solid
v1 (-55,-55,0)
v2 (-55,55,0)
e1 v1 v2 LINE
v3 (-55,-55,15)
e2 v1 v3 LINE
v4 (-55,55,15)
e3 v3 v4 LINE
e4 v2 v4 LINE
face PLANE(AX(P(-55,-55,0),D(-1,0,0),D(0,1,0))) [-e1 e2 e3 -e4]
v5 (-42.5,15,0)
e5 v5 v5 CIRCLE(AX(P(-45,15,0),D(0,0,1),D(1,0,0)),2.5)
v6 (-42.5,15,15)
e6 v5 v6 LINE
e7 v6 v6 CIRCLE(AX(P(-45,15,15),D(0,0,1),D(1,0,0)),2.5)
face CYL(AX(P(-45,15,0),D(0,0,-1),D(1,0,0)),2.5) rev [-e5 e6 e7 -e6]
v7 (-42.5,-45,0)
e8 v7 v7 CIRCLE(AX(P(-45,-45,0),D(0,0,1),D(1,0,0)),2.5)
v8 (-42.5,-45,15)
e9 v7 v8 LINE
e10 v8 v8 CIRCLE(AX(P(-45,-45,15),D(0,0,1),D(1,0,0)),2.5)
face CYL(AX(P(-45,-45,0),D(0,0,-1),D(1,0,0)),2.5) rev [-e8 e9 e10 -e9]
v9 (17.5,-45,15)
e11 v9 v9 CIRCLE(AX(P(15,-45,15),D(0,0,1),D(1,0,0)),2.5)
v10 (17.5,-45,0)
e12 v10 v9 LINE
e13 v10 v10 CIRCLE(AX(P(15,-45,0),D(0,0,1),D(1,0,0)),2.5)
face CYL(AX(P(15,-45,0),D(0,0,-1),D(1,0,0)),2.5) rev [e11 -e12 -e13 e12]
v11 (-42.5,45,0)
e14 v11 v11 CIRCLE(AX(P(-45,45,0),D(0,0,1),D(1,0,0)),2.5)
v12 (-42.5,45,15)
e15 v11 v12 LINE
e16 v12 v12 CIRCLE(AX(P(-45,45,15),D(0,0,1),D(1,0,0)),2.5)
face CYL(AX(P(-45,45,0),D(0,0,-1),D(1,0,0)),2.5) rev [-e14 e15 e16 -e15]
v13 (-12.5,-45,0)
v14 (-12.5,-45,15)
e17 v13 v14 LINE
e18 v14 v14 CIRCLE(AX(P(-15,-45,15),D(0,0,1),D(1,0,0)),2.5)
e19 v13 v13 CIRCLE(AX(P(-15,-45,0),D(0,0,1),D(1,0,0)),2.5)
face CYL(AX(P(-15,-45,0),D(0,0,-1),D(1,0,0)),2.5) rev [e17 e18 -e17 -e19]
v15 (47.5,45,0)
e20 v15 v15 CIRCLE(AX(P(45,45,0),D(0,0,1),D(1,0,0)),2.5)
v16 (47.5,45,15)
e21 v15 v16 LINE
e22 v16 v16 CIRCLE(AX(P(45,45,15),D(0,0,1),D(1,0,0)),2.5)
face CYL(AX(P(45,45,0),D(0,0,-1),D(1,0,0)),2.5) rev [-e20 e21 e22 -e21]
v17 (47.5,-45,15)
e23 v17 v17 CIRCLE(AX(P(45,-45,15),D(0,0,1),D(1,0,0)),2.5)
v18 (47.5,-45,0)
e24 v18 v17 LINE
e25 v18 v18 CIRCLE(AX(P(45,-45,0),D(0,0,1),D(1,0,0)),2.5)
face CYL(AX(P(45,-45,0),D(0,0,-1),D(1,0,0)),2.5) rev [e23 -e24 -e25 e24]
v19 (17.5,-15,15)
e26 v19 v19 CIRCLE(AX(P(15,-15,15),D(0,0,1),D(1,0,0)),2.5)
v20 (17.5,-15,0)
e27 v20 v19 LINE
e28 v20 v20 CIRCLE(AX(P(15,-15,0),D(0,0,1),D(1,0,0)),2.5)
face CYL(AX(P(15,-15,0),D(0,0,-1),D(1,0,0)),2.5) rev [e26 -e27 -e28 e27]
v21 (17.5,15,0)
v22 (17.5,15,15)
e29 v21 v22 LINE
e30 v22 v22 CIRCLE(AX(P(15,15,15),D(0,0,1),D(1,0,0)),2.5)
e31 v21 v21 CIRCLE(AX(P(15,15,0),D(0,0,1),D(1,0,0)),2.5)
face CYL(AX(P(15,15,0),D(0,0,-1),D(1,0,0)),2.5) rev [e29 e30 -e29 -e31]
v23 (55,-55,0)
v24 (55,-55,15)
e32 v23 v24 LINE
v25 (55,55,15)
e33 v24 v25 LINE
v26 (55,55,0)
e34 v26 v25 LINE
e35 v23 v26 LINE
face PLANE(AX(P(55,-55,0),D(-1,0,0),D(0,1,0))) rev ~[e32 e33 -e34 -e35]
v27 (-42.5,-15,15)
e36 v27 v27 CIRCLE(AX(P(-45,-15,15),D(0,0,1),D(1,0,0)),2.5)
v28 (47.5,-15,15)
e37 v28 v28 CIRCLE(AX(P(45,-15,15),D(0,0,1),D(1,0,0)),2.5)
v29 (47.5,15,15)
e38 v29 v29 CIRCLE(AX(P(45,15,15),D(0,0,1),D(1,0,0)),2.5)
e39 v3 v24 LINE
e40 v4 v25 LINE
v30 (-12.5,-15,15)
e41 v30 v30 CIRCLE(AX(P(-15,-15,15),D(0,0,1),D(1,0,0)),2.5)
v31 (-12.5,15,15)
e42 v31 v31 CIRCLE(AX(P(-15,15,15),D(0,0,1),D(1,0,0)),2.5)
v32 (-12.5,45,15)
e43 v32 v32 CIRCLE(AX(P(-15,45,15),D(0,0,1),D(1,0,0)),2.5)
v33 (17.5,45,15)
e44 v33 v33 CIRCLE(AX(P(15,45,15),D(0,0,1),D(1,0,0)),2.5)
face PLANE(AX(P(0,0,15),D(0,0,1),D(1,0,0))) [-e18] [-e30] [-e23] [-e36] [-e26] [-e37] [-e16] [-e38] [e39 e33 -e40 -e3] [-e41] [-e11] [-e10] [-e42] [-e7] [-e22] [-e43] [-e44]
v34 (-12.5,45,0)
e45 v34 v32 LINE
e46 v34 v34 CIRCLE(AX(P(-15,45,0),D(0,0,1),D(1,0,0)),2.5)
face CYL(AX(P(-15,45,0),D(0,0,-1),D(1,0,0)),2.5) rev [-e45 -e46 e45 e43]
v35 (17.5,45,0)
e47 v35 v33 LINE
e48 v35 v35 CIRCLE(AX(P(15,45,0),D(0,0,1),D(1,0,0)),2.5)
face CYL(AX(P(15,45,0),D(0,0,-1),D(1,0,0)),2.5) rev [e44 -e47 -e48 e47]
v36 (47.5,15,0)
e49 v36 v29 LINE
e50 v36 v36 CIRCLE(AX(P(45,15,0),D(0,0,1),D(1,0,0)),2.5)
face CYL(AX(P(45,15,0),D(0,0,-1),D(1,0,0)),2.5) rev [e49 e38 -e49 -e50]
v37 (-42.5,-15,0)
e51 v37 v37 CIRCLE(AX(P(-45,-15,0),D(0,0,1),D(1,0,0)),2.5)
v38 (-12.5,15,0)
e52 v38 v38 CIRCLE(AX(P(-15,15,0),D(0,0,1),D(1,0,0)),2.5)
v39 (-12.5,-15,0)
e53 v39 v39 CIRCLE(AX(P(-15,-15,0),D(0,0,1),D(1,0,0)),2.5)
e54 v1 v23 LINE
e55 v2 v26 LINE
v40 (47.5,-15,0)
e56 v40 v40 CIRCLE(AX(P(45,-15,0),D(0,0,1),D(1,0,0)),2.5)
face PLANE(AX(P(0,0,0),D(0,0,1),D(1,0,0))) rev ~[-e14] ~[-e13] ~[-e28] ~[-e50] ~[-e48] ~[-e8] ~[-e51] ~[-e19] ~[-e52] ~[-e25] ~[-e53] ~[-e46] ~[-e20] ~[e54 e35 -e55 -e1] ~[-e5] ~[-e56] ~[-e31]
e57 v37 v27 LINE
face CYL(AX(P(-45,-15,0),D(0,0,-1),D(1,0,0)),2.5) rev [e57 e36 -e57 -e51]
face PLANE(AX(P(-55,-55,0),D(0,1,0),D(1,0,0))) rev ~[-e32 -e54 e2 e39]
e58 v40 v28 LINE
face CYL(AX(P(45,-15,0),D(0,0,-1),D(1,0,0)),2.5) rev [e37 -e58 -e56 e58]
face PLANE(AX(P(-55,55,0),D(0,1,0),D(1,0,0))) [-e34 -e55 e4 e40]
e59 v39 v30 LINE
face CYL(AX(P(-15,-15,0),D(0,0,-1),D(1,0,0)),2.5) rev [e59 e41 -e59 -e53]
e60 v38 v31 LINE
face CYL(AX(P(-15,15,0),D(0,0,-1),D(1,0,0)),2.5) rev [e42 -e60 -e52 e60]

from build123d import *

# Parameters (mm, degrees)
F0_W     = 110
F0_H     = 110
F0_R     = 2.5
F1_DEPTH = 15


# Not quite as in the source:
# - the program builds the solid bodies; features that only make, move or delete a surface that nothing else refers to are left out


with BuildPart() as f1:
    # F0 (on Top) → F1 (new body)
    with BuildSketch(Plane.XY):
        Rectangle(F0_W, F0_H)
        with Locations((-45, -45)):
            Circle(F0_R, mode=Mode.SUBTRACT)
        with Locations((-15, -45)):
            Circle(F0_R, mode=Mode.SUBTRACT)
        with Locations((-45, -15)):
            Circle(F0_R, mode=Mode.SUBTRACT)
        with Locations((-15, -15)):
            Circle(F0_R, mode=Mode.SUBTRACT)
        with Locations((15, -45)):
            Circle(F0_R, mode=Mode.SUBTRACT)
        with Locations((45, -45)):
            Circle(F0_R, mode=Mode.SUBTRACT)
        with Locations((15, -15)):
            Circle(F0_R, mode=Mode.SUBTRACT)
        with Locations((45, -15)):
            Circle(F0_R, mode=Mode.SUBTRACT)
        with Locations((-45, 15)):
            Circle(F0_R, mode=Mode.SUBTRACT)
        with Locations((-15, 15)):
            Circle(F0_R, mode=Mode.SUBTRACT)
        with Locations((-45, 45)):
            Circle(F0_R, mode=Mode.SUBTRACT)
        with Locations((-15, 45)):
            Circle(F0_R, mode=Mode.SUBTRACT)
        with Locations((15, 15)):
            Circle(F0_R, mode=Mode.SUBTRACT)
        with Locations((45, 15)):
            Circle(F0_R, mode=Mode.SUBTRACT)
        with Locations((15, 45)):
            Circle(F0_R, mode=Mode.SUBTRACT)
        with Locations((45, 45)):
            Circle(F0_R, mode=Mode.SUBTRACT)
    extrude(amount=F1_DEPTH)


solid = f1.part
